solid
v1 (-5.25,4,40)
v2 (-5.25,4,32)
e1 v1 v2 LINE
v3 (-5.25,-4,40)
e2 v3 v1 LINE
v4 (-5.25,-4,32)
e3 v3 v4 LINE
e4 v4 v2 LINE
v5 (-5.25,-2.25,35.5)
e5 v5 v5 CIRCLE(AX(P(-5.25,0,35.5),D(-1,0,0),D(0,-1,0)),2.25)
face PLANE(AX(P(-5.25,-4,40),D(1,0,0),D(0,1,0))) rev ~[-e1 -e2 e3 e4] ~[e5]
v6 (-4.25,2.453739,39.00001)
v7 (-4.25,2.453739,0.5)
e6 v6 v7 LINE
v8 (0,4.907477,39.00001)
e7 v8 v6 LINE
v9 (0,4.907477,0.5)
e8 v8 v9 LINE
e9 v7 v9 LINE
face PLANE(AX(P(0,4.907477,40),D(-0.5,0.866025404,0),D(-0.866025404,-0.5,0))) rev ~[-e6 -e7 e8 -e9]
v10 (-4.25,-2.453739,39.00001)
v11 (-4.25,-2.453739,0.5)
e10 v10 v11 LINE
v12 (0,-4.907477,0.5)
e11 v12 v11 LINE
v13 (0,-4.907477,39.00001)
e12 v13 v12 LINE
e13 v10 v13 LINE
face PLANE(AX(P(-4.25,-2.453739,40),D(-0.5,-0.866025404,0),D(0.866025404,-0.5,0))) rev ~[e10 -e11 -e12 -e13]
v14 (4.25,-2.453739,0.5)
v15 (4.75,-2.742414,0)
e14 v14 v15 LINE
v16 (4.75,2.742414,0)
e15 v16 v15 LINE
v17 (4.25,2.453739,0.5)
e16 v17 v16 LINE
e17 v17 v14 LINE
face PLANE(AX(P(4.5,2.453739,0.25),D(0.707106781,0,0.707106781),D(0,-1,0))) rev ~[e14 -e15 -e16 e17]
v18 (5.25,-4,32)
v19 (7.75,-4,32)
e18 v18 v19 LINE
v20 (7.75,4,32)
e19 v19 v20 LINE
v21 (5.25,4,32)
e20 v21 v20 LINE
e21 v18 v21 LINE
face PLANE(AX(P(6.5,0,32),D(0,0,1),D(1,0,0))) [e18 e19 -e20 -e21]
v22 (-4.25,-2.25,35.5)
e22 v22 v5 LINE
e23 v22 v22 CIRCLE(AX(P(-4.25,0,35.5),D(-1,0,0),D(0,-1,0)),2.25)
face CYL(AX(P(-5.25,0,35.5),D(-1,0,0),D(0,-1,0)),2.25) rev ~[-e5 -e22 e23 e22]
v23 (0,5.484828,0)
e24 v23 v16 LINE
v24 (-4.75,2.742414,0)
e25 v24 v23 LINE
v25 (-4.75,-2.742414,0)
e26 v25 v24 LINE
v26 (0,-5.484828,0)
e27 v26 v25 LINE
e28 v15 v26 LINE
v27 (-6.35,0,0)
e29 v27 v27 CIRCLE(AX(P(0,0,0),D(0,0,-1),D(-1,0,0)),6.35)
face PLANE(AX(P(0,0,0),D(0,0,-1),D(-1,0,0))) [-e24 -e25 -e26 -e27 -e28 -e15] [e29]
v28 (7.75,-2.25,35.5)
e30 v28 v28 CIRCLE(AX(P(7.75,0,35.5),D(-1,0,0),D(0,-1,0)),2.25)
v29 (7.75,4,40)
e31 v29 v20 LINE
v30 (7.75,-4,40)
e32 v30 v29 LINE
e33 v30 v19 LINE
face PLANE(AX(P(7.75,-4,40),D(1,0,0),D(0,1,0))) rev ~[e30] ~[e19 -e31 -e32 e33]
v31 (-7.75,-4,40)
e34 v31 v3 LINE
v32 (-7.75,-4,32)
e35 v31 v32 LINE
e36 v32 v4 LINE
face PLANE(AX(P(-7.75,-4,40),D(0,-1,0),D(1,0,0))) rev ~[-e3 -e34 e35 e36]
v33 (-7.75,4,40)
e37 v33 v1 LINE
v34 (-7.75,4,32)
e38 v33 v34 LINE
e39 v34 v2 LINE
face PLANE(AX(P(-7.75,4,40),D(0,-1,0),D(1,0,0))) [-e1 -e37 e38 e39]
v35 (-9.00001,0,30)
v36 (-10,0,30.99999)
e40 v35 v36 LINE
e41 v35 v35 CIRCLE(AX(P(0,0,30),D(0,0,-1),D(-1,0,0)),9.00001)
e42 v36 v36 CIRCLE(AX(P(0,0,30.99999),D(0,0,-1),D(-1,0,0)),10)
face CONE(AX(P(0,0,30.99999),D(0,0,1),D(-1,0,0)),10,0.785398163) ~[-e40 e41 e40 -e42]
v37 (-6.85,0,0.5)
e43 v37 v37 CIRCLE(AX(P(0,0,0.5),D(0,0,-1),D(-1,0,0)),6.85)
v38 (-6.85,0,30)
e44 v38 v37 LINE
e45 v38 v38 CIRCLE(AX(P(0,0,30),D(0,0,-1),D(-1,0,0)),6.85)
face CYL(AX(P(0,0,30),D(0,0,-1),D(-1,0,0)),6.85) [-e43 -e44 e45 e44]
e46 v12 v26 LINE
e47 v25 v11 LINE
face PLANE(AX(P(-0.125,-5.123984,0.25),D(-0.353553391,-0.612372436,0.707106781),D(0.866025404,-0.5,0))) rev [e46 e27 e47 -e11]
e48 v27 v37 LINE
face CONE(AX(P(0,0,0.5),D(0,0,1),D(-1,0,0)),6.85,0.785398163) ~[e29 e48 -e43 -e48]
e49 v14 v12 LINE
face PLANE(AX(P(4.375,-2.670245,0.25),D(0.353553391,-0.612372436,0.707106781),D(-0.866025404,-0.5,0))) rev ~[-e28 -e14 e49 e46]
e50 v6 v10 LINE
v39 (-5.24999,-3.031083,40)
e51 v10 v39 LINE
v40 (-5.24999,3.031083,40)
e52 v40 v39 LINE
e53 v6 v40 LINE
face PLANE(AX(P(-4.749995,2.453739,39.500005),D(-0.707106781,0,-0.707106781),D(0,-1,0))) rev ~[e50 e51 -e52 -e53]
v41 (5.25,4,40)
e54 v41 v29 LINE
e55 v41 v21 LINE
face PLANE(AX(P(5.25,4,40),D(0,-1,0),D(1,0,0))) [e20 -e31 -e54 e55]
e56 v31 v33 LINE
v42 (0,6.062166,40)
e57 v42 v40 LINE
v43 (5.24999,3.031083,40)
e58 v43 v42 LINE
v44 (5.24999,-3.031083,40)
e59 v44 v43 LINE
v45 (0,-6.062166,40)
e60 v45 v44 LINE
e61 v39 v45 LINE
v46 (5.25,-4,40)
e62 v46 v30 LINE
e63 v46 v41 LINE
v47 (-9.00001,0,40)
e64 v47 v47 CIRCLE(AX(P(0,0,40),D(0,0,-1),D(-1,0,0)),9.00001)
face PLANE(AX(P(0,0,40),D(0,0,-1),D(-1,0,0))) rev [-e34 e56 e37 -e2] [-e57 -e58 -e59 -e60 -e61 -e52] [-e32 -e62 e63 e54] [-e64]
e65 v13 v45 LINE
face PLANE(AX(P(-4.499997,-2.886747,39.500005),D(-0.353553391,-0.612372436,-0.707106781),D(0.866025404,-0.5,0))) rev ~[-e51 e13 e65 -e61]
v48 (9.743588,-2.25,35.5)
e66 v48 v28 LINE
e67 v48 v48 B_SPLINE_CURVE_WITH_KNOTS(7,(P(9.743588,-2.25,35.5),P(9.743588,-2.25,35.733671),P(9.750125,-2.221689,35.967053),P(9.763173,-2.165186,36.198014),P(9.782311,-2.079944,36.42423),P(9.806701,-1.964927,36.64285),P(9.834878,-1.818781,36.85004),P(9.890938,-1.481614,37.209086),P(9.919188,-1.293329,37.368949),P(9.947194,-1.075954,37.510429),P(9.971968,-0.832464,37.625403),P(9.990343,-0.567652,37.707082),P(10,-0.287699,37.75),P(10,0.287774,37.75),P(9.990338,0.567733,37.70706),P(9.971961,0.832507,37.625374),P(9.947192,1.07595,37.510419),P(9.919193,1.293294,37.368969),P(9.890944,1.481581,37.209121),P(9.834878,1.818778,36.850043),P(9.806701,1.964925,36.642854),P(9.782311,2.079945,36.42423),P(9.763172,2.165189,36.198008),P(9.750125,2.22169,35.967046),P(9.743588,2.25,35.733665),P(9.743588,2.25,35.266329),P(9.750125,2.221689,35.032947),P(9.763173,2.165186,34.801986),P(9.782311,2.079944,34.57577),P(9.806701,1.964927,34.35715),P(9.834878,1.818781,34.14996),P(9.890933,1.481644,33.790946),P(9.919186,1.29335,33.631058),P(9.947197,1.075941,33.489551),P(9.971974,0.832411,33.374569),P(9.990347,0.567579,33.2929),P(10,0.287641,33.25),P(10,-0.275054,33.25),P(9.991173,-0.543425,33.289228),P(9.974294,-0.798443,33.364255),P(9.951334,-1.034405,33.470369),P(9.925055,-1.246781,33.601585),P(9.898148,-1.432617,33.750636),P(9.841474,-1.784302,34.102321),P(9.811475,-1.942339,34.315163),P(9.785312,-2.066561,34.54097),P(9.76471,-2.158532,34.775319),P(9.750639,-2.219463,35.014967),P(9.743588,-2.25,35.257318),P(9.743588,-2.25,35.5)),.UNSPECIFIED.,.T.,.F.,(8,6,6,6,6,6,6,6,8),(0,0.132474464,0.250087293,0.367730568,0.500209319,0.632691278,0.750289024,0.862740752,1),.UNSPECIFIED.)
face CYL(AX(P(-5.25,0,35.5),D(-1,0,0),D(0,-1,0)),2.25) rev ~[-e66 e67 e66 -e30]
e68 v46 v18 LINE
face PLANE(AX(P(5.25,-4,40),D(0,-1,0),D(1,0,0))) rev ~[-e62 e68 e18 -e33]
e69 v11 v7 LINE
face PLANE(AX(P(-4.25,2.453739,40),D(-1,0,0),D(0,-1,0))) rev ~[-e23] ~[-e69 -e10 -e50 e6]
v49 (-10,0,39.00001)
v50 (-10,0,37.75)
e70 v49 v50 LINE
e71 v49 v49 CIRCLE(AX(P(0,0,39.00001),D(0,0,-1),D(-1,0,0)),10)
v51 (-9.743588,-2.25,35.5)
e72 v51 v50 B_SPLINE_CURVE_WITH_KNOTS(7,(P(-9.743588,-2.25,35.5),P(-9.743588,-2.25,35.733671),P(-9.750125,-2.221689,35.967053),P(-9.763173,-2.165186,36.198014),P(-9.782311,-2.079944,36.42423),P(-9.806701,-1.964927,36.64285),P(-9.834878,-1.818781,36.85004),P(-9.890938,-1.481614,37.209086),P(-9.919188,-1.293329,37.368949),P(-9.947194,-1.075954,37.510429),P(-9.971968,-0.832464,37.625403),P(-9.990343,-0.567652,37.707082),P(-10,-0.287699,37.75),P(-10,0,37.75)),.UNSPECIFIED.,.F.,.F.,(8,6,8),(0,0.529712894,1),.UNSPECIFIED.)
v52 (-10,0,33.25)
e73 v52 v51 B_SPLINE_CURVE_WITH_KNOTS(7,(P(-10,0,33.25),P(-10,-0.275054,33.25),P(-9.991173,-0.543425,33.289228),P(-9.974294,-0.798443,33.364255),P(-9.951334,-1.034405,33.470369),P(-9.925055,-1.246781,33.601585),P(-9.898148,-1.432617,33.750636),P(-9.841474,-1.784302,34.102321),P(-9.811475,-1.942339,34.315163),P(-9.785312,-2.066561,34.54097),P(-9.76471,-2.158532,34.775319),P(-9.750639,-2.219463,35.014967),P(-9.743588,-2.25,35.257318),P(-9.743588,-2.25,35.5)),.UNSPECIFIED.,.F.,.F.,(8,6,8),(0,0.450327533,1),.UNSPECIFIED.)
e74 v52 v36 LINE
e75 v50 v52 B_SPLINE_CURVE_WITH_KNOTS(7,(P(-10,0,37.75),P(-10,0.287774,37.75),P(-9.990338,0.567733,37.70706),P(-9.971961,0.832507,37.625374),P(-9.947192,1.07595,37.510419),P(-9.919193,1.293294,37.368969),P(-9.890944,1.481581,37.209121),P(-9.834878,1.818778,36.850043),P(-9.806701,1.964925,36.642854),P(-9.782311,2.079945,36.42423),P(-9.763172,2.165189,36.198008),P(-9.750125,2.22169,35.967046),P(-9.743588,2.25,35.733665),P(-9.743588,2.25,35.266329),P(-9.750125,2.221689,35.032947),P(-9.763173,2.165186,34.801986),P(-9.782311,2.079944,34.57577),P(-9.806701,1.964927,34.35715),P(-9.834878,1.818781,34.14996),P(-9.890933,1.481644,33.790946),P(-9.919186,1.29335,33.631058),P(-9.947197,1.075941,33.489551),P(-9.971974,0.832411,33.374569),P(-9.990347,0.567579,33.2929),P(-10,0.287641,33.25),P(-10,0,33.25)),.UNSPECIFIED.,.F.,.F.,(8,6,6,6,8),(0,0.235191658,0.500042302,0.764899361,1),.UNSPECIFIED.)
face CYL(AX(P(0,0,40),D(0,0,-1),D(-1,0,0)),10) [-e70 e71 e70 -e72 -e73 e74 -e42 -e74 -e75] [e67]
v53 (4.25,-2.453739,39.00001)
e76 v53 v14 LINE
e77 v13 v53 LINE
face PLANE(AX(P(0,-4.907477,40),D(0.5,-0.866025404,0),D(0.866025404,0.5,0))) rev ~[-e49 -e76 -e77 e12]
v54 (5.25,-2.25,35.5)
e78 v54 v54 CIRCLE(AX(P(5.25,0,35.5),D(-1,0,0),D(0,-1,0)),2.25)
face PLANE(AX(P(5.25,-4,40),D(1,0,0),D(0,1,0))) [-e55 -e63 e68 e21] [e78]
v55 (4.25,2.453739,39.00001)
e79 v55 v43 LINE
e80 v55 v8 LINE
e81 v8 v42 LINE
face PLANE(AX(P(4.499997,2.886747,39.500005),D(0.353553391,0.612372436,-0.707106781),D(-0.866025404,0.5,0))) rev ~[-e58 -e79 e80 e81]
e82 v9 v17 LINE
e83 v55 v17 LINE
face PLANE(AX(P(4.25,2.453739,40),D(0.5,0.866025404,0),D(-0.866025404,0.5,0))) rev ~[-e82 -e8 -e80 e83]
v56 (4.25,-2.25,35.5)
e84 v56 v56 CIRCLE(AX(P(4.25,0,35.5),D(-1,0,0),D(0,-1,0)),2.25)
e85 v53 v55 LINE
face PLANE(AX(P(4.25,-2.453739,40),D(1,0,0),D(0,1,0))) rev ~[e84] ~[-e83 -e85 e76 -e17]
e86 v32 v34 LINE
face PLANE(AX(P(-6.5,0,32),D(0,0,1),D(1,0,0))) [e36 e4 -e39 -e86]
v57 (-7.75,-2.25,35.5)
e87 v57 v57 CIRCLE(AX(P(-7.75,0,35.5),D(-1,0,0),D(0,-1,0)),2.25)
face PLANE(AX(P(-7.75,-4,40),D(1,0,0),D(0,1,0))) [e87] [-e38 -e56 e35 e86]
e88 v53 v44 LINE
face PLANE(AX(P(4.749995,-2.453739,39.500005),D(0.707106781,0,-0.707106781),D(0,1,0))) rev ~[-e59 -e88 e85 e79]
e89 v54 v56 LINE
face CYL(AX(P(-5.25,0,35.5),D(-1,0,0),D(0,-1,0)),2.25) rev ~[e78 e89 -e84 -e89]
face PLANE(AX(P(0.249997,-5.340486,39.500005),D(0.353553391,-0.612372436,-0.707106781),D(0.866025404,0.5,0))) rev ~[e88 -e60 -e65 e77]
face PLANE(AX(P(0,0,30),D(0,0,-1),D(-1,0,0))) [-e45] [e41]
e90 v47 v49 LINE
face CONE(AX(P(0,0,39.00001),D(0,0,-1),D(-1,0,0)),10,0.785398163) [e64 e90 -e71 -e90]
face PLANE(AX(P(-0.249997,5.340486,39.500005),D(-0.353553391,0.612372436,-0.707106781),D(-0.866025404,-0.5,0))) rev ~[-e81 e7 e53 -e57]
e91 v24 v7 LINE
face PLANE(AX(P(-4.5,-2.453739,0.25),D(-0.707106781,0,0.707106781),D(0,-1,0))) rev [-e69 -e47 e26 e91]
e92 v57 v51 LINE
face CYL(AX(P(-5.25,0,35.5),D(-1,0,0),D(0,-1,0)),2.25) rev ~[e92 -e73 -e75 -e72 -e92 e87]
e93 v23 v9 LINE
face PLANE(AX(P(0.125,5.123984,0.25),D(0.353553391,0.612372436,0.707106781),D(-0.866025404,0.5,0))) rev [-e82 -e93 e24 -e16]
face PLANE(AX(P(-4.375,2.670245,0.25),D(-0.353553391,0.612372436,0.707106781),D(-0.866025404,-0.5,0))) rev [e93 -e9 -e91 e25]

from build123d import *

# Parameters (mm, degrees)
F3_DEPTH = 40.001
F2_W     = 2.5
F2_H     = 8
F4_DEPTH = 8
F5_R     = 2.25
F6_DEPTH = 25
F7_SIZE  = 0.99999
F8_SIZE  = 0.5


# Not quite as in the source:
# - a fillet or chamfer is up to 0.001 mm smaller than in the source, because OpenCascade refuses the exact size


with BuildPart() as f1:
    # F0 (on Front) → F1 (revolve)
    with BuildSketch(Plane.XZ):
        Polygon((-6.85, 0), (0, 0), (0, 40), (-10, 40), (-10, 30), (-6.85, 30), align=None)
    revolve(axis=Axis((0, 0, 20), (0, 0, -1)))

    # F2 (on face) → F3 (cut, through all)
    with BuildSketch(Plane.XY.offset(40)):
        Polygon((4.25, -2.4537386441), (4.25, 2.4537386441), (0, 4.9074772881), (-4.25, 2.4537386441), (-4.25, -2.4537386441), (0, -4.9074772881), align=None)
    extrude(amount=-F3_DEPTH, mode=Mode.SUBTRACT)

    # F2 (on face) → F4 (cut)
    with BuildSketch(Plane.XY.offset(40)):
        with Locations((-6.5, 0)):
            Rectangle(F2_W, F2_H)
        with Locations((6.5, 0)):
            Rectangle(F2_W, F2_H)
    extrude(amount=-F4_DEPTH, mode=Mode.SUBTRACT)

    # F5 (on face) → F6 (cut, symmetric)
    with BuildSketch(Plane(origin=(-5.25, 0, 0), x_dir=(0, -1, 0), z_dir=(-1, 0, 0))):
        with Locations((0, 35.5)):
            Circle(F5_R)
    extrude(amount=F6_DEPTH, both=True, mode=Mode.SUBTRACT)

    # F7 (size 1 in the source; OpenCascade refuses exactly that, so slightly less here)
    f7_edges = [f1.edges().sort_by_distance(p)[0] for p in [
        (10, 0, 40),
        (10, 0, 30),
        (-2.125, 3.680608, 40),
        (2.125, 3.680608, 40),
        (4.25, 0, 40),
        (2.125, -3.680608, 40),
        (-2.125, -3.680608, 40),
        (-4.25, 0, 40),
    ]]
    chamfer(f7_edges, length=F7_SIZE)

    # F8
    f8_edges = [f1.edges().sort_by_distance(p)[0] for p in [
        (6.85, 0, 0),
        (4.25, 0, 0),
        (2.125, -3.680608, 0),
        (-2.125, -3.680608, 0),
        (-4.25, 0, 0),
        (-2.125, 3.680608, 0),
        (2.125, 3.680608, 0),
    ]]
    chamfer(f8_edges, length=F8_SIZE)


solid = f1.part
